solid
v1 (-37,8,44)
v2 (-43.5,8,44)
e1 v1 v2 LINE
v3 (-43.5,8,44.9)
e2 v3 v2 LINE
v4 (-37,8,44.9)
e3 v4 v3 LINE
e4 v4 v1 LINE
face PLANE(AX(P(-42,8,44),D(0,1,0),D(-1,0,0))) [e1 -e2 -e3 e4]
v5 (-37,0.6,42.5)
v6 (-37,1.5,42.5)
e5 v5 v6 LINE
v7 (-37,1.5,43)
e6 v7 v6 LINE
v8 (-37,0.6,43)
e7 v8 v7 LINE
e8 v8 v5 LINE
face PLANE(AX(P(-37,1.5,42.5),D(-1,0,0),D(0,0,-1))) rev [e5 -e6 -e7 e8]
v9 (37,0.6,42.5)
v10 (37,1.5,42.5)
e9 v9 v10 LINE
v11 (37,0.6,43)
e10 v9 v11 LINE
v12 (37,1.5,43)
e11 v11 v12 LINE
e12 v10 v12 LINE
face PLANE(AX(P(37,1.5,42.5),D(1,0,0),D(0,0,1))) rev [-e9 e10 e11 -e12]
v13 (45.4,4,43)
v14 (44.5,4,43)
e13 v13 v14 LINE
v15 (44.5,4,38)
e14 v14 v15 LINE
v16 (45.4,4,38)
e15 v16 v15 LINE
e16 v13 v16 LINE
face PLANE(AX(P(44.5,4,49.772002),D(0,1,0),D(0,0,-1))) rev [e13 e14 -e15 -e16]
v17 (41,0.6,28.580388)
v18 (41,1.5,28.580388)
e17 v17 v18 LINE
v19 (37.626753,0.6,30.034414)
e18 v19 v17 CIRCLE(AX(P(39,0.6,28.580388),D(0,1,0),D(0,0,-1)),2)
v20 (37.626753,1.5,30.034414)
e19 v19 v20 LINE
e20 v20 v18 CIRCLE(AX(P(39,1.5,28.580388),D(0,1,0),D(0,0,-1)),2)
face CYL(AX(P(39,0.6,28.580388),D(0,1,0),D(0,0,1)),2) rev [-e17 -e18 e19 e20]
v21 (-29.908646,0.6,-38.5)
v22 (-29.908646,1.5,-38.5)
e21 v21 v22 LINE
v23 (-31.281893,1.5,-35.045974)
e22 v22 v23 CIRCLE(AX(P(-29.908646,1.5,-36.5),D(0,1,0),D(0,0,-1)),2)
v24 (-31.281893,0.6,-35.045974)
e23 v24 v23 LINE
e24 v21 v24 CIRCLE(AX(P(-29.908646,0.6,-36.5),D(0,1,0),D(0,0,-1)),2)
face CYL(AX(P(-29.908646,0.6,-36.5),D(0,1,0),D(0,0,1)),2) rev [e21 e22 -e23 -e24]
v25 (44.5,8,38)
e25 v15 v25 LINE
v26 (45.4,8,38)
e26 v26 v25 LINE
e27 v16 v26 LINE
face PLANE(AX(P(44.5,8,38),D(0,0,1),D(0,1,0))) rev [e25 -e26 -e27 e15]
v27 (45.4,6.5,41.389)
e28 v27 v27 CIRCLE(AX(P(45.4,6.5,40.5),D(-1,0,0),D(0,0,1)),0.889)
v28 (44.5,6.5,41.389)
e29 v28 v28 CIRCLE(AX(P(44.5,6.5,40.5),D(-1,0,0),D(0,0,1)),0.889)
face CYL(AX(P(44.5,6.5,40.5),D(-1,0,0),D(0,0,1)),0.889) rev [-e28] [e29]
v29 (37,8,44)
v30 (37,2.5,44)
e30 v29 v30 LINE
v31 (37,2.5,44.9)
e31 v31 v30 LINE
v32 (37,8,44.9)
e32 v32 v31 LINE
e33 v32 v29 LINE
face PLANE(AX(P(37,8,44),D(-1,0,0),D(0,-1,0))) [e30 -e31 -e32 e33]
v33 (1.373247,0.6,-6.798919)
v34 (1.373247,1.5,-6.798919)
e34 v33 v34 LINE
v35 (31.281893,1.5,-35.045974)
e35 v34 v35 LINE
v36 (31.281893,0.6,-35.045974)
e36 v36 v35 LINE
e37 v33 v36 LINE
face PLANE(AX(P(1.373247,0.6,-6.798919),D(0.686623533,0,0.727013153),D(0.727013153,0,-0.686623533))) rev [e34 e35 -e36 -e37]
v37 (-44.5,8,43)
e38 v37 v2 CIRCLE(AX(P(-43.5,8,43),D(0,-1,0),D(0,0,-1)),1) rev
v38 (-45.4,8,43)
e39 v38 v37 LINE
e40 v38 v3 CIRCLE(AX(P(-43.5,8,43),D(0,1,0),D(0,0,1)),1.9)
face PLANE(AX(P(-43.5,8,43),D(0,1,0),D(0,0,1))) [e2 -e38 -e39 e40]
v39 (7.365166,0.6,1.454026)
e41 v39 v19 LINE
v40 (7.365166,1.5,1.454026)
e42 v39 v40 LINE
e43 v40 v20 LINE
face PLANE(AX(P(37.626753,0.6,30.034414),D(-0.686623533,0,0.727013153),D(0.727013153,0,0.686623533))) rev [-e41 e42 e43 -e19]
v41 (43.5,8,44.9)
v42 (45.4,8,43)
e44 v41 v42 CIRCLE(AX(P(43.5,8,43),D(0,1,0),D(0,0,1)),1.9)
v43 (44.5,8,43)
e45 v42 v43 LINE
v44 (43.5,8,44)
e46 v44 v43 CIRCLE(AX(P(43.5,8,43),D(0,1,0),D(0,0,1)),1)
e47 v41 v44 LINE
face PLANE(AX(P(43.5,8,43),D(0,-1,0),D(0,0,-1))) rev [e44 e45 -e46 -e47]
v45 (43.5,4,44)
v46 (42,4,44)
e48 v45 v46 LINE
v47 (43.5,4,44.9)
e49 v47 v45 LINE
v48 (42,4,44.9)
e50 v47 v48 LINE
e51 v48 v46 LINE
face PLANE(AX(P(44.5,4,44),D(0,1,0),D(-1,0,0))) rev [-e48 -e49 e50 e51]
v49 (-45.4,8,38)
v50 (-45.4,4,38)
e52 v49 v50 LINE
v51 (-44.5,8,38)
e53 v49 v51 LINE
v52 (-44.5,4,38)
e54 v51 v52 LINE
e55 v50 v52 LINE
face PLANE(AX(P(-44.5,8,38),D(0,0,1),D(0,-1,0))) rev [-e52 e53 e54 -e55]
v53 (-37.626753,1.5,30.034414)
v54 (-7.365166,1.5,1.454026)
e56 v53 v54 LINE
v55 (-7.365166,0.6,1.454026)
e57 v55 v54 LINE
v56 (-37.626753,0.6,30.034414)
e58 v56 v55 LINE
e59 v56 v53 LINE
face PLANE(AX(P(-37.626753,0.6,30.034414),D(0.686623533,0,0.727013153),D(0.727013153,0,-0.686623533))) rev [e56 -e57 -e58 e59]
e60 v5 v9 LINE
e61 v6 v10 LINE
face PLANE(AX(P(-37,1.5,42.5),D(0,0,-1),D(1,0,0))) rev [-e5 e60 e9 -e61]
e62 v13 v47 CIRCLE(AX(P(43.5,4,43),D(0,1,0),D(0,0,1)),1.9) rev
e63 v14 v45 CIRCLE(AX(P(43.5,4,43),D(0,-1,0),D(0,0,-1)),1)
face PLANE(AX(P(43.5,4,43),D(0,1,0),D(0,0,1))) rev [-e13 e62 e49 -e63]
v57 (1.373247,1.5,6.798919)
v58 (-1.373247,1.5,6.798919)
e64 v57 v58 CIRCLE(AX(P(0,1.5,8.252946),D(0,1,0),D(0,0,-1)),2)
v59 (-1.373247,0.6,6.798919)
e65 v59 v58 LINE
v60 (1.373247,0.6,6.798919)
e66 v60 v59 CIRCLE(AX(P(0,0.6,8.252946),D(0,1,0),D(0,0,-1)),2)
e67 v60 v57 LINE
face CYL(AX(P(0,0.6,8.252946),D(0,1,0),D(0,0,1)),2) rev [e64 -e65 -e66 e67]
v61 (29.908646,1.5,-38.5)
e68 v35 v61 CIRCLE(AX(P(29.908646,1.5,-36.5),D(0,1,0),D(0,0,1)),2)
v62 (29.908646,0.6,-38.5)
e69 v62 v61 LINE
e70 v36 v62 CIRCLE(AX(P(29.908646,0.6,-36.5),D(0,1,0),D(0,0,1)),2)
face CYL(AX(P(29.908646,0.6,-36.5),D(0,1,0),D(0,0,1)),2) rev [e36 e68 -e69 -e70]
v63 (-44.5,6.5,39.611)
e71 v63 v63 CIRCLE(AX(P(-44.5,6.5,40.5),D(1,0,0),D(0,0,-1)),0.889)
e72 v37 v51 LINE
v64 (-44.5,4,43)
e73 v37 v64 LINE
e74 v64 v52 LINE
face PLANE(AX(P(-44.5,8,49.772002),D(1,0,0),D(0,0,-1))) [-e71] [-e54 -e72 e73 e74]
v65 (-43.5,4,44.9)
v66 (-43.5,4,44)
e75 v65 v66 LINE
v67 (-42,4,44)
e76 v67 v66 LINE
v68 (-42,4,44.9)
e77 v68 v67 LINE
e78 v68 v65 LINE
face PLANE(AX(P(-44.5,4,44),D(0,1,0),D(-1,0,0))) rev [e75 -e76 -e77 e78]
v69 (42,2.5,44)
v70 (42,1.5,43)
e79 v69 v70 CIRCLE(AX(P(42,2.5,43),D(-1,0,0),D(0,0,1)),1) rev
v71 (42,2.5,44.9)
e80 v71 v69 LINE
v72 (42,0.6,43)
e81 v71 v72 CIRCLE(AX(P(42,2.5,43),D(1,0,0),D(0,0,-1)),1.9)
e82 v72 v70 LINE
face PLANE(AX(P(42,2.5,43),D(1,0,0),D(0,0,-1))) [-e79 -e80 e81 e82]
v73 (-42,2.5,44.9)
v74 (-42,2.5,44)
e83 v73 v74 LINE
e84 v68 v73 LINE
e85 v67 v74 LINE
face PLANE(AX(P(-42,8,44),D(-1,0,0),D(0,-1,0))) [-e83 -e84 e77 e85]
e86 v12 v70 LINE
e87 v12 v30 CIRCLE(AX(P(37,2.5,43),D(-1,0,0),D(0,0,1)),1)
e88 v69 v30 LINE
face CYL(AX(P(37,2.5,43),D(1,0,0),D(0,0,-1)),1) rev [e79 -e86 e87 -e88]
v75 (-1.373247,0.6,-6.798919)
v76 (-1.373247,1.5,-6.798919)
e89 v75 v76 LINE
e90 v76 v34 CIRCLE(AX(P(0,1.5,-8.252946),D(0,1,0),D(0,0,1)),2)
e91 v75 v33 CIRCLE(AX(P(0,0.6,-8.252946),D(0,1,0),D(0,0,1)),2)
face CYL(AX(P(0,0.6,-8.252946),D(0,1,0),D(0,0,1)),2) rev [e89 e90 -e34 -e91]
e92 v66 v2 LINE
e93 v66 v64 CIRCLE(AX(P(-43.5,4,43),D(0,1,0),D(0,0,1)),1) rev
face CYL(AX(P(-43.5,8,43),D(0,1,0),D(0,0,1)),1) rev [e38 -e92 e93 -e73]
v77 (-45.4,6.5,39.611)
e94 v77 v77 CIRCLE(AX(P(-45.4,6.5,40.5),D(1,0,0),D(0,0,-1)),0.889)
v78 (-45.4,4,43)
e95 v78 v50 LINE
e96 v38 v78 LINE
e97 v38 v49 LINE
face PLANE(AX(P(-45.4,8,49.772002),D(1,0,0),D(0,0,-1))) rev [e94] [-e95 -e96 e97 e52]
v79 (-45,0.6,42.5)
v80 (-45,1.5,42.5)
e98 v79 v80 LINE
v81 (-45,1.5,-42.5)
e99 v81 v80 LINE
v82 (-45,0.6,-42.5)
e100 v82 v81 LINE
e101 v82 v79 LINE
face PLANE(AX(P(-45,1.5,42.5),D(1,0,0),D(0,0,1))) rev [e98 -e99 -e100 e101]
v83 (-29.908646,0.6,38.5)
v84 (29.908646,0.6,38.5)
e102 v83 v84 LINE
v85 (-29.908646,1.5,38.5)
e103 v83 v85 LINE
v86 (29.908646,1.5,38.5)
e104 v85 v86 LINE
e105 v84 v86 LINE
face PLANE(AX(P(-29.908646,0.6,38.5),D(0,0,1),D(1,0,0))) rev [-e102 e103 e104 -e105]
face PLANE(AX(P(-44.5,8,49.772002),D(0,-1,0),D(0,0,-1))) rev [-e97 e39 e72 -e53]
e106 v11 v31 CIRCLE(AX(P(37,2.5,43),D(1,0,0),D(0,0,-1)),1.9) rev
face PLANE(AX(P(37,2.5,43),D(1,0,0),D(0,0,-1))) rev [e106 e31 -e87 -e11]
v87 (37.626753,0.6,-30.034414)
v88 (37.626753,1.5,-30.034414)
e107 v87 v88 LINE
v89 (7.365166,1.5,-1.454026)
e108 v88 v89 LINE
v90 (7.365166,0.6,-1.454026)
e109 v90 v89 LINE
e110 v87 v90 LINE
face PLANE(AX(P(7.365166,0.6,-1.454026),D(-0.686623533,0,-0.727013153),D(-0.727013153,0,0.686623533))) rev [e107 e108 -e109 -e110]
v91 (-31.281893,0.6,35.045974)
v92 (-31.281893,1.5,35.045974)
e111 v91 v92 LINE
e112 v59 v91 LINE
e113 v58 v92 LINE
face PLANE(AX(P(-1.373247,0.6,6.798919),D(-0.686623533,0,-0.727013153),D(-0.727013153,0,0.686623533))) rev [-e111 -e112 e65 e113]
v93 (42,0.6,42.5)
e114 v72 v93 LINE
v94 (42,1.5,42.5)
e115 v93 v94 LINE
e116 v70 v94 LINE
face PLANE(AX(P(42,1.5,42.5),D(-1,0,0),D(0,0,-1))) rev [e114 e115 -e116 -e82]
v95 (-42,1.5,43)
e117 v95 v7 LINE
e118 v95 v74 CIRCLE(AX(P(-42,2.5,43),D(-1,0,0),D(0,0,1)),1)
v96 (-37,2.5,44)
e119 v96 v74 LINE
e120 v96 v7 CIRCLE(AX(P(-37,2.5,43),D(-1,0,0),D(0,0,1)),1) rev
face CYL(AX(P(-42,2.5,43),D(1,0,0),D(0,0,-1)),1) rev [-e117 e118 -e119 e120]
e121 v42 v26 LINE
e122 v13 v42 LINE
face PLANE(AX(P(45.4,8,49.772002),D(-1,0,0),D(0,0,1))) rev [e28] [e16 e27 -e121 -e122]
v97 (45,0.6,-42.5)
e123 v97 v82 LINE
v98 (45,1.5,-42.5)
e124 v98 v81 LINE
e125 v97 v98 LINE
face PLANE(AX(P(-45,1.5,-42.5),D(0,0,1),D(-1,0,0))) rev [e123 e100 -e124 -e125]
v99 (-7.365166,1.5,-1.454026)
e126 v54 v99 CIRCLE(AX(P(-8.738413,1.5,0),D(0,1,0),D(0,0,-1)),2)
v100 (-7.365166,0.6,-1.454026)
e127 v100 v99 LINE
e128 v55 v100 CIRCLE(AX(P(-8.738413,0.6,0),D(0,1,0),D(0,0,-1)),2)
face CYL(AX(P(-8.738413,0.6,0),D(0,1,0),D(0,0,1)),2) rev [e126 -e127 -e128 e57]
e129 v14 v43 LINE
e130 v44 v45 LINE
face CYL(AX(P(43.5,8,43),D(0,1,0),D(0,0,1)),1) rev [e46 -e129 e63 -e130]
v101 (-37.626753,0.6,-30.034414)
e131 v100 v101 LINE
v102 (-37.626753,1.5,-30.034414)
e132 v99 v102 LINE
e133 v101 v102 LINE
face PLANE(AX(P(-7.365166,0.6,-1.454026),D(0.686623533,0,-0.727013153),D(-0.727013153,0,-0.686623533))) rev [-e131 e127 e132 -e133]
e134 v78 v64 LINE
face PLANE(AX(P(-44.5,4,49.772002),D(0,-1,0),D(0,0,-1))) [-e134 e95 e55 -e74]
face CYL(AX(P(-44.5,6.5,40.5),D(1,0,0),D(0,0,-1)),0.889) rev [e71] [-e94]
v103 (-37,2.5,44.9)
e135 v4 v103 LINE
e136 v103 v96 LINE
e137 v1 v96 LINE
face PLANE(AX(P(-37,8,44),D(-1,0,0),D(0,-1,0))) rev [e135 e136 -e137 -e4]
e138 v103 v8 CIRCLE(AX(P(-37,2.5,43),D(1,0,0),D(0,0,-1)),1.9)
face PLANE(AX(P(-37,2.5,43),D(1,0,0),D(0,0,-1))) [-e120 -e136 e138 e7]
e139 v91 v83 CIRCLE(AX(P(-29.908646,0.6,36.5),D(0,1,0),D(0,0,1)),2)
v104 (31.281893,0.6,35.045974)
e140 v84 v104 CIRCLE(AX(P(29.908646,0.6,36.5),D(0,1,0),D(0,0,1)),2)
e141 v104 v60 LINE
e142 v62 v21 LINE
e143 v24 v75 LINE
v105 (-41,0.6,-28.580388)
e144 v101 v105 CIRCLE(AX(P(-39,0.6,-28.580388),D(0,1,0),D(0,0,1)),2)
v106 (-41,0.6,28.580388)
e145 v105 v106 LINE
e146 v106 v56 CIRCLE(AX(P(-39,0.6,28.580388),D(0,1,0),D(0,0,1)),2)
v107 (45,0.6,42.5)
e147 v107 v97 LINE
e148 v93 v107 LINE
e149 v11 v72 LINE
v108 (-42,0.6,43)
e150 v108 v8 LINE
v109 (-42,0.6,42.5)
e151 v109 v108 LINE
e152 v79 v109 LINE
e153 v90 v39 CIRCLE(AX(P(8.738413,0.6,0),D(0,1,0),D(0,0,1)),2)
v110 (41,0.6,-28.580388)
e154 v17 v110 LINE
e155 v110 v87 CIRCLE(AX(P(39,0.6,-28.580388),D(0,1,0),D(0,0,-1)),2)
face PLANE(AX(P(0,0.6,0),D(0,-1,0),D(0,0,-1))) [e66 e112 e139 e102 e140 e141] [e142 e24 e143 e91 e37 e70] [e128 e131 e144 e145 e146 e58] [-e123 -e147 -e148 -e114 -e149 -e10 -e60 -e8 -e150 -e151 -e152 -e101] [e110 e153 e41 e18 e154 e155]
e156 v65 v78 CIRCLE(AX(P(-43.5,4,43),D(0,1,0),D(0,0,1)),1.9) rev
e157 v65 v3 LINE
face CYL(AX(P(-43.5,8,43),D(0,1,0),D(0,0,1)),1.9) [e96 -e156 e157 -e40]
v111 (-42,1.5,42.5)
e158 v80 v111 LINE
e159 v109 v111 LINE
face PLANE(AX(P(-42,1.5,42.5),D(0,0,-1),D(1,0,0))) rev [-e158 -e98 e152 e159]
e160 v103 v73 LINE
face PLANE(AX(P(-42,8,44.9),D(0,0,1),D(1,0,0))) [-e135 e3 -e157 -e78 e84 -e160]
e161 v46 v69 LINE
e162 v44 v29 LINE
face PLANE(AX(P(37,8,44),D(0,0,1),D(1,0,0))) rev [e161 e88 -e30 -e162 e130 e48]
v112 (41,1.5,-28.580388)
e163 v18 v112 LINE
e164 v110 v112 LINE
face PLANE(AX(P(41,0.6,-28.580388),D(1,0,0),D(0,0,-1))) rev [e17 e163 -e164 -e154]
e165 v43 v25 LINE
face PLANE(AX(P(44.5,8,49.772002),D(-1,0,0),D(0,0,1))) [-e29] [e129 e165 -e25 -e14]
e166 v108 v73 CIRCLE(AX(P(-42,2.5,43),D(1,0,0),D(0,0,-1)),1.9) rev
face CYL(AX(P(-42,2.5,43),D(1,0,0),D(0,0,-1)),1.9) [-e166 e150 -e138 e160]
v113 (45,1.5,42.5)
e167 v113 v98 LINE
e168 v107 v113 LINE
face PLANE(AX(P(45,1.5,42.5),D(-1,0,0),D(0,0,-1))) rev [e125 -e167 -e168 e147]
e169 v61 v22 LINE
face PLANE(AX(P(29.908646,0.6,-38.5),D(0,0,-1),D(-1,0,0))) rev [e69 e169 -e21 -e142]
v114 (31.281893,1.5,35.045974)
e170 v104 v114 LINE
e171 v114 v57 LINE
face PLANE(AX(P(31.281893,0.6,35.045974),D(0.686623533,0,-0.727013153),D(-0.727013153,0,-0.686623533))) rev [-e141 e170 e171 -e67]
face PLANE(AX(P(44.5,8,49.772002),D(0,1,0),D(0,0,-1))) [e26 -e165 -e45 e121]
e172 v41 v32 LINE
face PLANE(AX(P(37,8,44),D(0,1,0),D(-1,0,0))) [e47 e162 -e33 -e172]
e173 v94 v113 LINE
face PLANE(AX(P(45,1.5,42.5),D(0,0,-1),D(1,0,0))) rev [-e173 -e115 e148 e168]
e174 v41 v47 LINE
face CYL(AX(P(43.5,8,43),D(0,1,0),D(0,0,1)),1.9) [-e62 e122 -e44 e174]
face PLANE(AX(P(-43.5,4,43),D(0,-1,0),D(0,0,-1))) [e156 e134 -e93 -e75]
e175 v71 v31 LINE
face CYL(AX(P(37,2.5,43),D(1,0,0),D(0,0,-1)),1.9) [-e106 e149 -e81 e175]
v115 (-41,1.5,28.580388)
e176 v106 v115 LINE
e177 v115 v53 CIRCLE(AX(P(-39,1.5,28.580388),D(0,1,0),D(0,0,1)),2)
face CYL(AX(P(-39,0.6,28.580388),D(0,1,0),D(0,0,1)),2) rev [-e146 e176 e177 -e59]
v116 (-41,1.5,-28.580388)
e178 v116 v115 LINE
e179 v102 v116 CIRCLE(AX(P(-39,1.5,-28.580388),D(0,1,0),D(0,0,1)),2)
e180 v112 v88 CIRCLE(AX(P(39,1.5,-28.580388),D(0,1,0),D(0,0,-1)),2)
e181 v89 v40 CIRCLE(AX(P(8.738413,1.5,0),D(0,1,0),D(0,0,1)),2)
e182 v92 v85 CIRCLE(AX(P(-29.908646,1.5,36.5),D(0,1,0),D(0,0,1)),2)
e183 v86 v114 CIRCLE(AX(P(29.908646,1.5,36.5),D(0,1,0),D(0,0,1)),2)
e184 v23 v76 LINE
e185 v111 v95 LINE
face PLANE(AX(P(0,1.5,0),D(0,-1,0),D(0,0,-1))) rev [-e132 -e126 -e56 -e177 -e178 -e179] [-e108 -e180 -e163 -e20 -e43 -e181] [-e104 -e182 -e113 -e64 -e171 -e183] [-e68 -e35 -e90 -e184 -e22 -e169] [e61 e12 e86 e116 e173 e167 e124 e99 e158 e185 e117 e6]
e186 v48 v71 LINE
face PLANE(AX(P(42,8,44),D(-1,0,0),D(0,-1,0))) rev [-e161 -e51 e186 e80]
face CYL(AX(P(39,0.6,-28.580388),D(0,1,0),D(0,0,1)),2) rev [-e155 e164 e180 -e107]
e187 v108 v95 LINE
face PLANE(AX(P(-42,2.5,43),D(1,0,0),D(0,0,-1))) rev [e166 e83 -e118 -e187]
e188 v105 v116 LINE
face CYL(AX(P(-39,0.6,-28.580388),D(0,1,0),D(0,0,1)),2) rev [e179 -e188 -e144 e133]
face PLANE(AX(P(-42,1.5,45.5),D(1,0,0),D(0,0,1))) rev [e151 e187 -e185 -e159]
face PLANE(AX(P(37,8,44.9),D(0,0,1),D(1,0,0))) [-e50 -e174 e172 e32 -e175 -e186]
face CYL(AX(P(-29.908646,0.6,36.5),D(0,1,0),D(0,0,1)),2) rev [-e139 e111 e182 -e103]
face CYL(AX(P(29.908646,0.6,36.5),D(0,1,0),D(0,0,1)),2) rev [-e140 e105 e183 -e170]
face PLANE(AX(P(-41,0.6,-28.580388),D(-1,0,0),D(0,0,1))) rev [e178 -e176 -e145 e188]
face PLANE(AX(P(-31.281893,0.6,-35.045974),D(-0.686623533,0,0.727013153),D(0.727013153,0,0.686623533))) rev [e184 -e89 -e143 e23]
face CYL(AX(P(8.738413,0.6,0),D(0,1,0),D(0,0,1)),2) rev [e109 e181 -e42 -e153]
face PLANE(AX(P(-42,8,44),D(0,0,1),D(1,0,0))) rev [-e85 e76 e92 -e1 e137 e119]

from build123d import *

# Parameters (mm, degrees)
BOSS_EXTRUDE1_DEPTH                 = 1.5
SKETCH3_W                           = 5
SKETCH3_H                           = 1.5
BOSS_EXTRUDE2_DEPTH                 = 6.5
BOSS_EXTRUDE3_DEPTH                 = 6
BOSS_EXTRUDE3_DEPTH_BACK            = 1.5
SKETCH4_W                           = 1.5
SKETCH4_H                           = 4
BOSS_EXTRUDE3_2_DEPTH               = 6
BOSS_EXTRUDE3_2_DEPTH_BACK          = 1.5
SKETCH5_W                           = 2.5
SKETCH5_H                           = 1.5
BOSS_EXTRUDE4_DEPTH                 = 4
CONVERT_SOLID2_DEPTH                = 0.6
CONVERT_SOLID2_START                = 0.6
CONVERT_SOLID2_2_DEPTH              = 7.4
CONVERT_SOLID2_3_OUTLINE_W          = 5
CONVERT_SOLID2_3_OUTLINE_H          = 0.9
CONVERT_SOLID2_3_DEPTH              = 0.15504
CONVERT_SOLID2_START_2              = 4
CONVERT_SOLID2_4_DEPTH              = 4
CONVERT_SOLID2_START_3              = -42
CONVERT_SOLID2_5_DEPTH              = 84
CONVERT_SOLID2_6_DEPTH              = 5
CONVERT_SOLID2_START_4              = 37
CONVERT_SOLID2_7_DEPTH              = 5
F_0_CLEARANCE_HOLE1_D               = 1.778
F_0_CLEARANCE_HOLE1_DEPTH           = 3.175
F_0_CLEARANCE_HOLE1_TIP             = 0.53416509
F_0_CLEARANCE_HOLE1_ON_FACE_2_D     = 1.778
F_0_CLEARANCE_HOLE1_ON_FACE_2_DEPTH = 3.175
F_0_CLEARANCE_HOLE1_ON_FACE_2_TIP   = 0.53416509
CUT_EXTRUDE1_DEPTH                  = 65.182707952


with BuildPart() as part:
    # Sketch1 → Boss-Extrude1 (new body)
    with BuildSketch(Plane(origin=(0, 0, 0), x_dir=(1, 0, 0), z_dir=(0, 1, 0))):
        Polygon((-42, -45.5), (-42, -42.5), (-45, -42.5), (-45, 42.5), (45, 42.5), (45, -42.5), (42, -42.5), (42, -45.5), (37, -45.5), (37, -42.5), (-37, -42.5), (-37, -45.5), align=None)
    extrude(amount=BOSS_EXTRUDE1_DEPTH)

    # Sketch3 → Boss-Extrude2 (add)
    with BuildSketch(Plane(origin=(0, 1.5, 0), x_dir=(1, 0, 0), z_dir=(0, 1, 0))):
        with Locations((-39.5, -44.75)):
            Rectangle(SKETCH3_W, SKETCH3_H)
        with Locations((39.5, -44.75)):
            Rectangle(SKETCH3_W, SKETCH3_H)
    extrude(amount=BOSS_EXTRUDE2_DEPTH)



with BuildPart() as body_2:
    # Sketch4 → Boss-Extrude3 (new, two sides: drawn at the far end of the back side and taken through both)
    with BuildSketch(Plane(origin=(0, 0, 44), x_dir=(-1, 0, 0), z_dir=(0, 0, -1)).offset(-BOSS_EXTRUDE3_DEPTH_BACK)):
        with Locations((45.25, 6)):
            Rectangle(SKETCH4_W, SKETCH4_H)
    extrude(amount=BOSS_EXTRUDE3_DEPTH + BOSS_EXTRUDE3_DEPTH_BACK)


with BuildPart() as body_3:
    # Sketch4 → Boss-Extrude3 2 (new, two sides: drawn at the far end of the back side and taken through both)
    with BuildSketch(Plane(origin=(0, 0, 44), x_dir=(-1, 0, 0), z_dir=(0, 0, -1)).offset(-BOSS_EXTRUDE3_2_DEPTH_BACK)):
        with Locations((-45.25, 6)):
            Rectangle(SKETCH4_W, SKETCH4_H)
    extrude(amount=BOSS_EXTRUDE3_2_DEPTH + BOSS_EXTRUDE3_2_DEPTH_BACK)


with BuildPart() as part_1:
    add(part.part)

    add(body_2.part)  # Boss-Extrude4 merges body 2

    add(body_3.part)  # Boss-Extrude4 merges body 3
    # Sketch5 → Boss-Extrude4 (add)
    with BuildSketch(Plane(origin=(0, 8, 0), x_dir=(1, 0, 0), z_dir=(0, 1, 0))):
        with Locations((-43.25, -44.75)):
            Rectangle(SKETCH5_W, SKETCH5_H)
        with Locations((43.25, -44.75)):
            Rectangle(SKETCH5_W, SKETCH5_H)
    extrude(amount=-BOSS_EXTRUDE4_DEPTH)

    # Convert-Solid2: read off the stored shape, not the designer's step
    # Convert-Solid2 outline → Convert-Solid2 (cut)
    with BuildSketch(Plane(origin=(0, 0, 0), x_dir=(1, 0, 0), z_dir=(0, 1, 0))):
        Polygon((37, -45.5), (42, -45.5), (42, -42.5), (45, -42.5), (45, 42.5), (-45, 42.5), (-45, -42.5), (-42, -42.5), (-42, -45.5), (-37, -45.5), (-37, -42.5), (37, -42.5), align=None)
    extrude(amount=CONVERT_SOLID2_DEPTH, mode=Mode.SUBTRACT)

    # Convert-Solid2 2 outline → Convert-Solid2 2 (cut)
    with BuildSketch(Plane(origin=(0, 0, 0), x_dir=(1, 0, 0), z_dir=(0, 1, 0)).offset(CONVERT_SOLID2_START)):
        with BuildLine():
            Line((37, -45.5), (46, -45.5))
            Line((46, -45.5), (46, -38))
            Line((46, -38), (45.4, -38))
            Line((45.4, -38), (45.4, -43))
            ThreePointArc((45.4, -43), (44.843502884, -44.343502884), (43.5, -44.9))
            Line((43.5, -44.9), (37, -44.9))
            Line((37, -44.9), (37, -45.5))
        make_face()
        with BuildLine():
            Line((-37, -45.5), (-37, -44.9))
            Line((-37, -44.9), (-43.5, -44.9))
            ThreePointArc((-43.5, -44.9), (-44.843502884, -44.343502884), (-45.4, -43))
            Line((-45.4, -43), (-45.4, -38))
            Line((-45.4, -38), (-46, -38))
            Line((-46, -38), (-46, -45.5))
            Line((-46, -45.5), (-37, -45.5))
        make_face()
    extrude(amount=CONVERT_SOLID2_2_DEPTH, mode=Mode.SUBTRACT)

    # Convert-Solid2 3 outline → Convert-Solid2 3 (cut)
    with BuildSketch(Plane(origin=(0, 0, 0), x_dir=(1, 0, 0), z_dir=(0, 1, 0)).offset(CONVERT_SOLID2_START)):
        with Locations((39.5, -44.45)):
            Rectangle(CONVERT_SOLID2_3_OUTLINE_W, CONVERT_SOLID2_3_OUTLINE_H)
        with Locations((-39.5, -44.45)):
            Rectangle(CONVERT_SOLID2_3_OUTLINE_W, CONVERT_SOLID2_3_OUTLINE_H)
    extrude(amount=CONVERT_SOLID2_3_DEPTH, mode=Mode.SUBTRACT)

    # Convert-Solid2 4 outline → Convert-Solid2 4 (add)
    with BuildSketch(Plane(origin=(0, 0, 0), x_dir=(1, 0, 0), z_dir=(0, 1, 0)).offset(CONVERT_SOLID2_START_2)):
        with BuildLine():
            ThreePointArc((44.5, -43), (44.207106781, -43.707106781), (43.5, -44))
            Line((43.5, -44), (44.5, -44))
            Line((44.5, -44), (44.5, -43))
        make_face()
        with BuildLine():
            Line((-44.5, -44), (-43.5, -44))
            ThreePointArc((-43.5, -44), (-44.207106781, -43.707106781), (-44.5, -43))
            Line((-44.5, -43), (-44.5, -44))
        make_face()
    extrude(amount=CONVERT_SOLID2_4_DEPTH)

    # Convert-Solid2 5 outline → Convert-Solid2 5 (cut)
    with BuildSketch(Plane.YZ.offset(CONVERT_SOLID2_START_3)):
        with BuildLine():
            ThreePointArc((0.6, 43), (1.156497116, 44.343502884), (2.5, 44.9))
            Line((2.5, 44.9), (0.75504, 44.9))
            Line((0.75504, 44.9), (0.75504, 44))
            Line((0.75504, 44), (0.6, 44))
            Line((0.6, 44), (0.6, 43))
        make_face()
    extrude(amount=CONVERT_SOLID2_5_DEPTH, mode=Mode.SUBTRACT)

    # Convert-Solid2 6 outline → Convert-Solid2 6 (add)
    with BuildSketch(Plane.YZ.offset(CONVERT_SOLID2_START_3)):
        with BuildLine():
            ThreePointArc((1.5, 43), (1.792893219, 43.707106781), (2.5, 44))
            Line((2.5, 44), (1.5, 44))
            Line((1.5, 44), (1.5, 43))
        make_face()
    extrude(amount=CONVERT_SOLID2_6_DEPTH)

    # Convert-Solid2 7 outline → Convert-Solid2 7 (add)
    with BuildSketch(Plane.YZ.offset(CONVERT_SOLID2_START_4)):
        with BuildLine():
            ThreePointArc((1.5, 43), (1.792893219, 43.707106781), (2.5, 44))
            Line((2.5, 44), (1.5, 44))
            Line((1.5, 44), (1.5, 43))
        make_face()
    extrude(amount=CONVERT_SOLID2_7_DEPTH)

    # #0 Clearance Hole1
    with Locations(Plane(origin=(-44.5, 6.5, 40.5), x_dir=(0, 0, 1), z_dir=(1, 0, 0))):
        with Locations((0, 0)):
            Hole(F_0_CLEARANCE_HOLE1_D / 2, depth=F_0_CLEARANCE_HOLE1_DEPTH)
            with Locations((0, 0, -(F_0_CLEARANCE_HOLE1_DEPTH + F_0_CLEARANCE_HOLE1_TIP / 2))):  # 118° drill point
                Cone(0, F_0_CLEARANCE_HOLE1_D / 2, F_0_CLEARANCE_HOLE1_TIP, mode=Mode.SUBTRACT)

    # #0 Clearance Hole1 on face 2
    with Locations(Plane(origin=(44.5, 6.5, 40.5), x_dir=(0, 0, -1), z_dir=(-1, 0, 0))):
        with Locations((0, 0)):
            Hole(F_0_CLEARANCE_HOLE1_ON_FACE_2_D / 2, depth=F_0_CLEARANCE_HOLE1_ON_FACE_2_DEPTH)
            with Locations((0, 0, -(F_0_CLEARANCE_HOLE1_ON_FACE_2_DEPTH + F_0_CLEARANCE_HOLE1_ON_FACE_2_TIP / 2))):  # 118° drill point
                Cone(0, F_0_CLEARANCE_HOLE1_ON_FACE_2_D / 2, F_0_CLEARANCE_HOLE1_ON_FACE_2_TIP, mode=Mode.SUBTRACT)

    # Sketch18 → Cut-Extrude1 (cut, through all)
    with BuildSketch(Plane(origin=(0, 1.5, 0), x_dir=(1, 0, 0), z_dir=(0, 1, 0))):
        with BuildLine():
            Line((-1.373247066, -6.798919297), (-31.281892899, -35.045973695))
            ThreePointArc((-31.281892899, -35.045973695), (-31.767146924, -37.238900328), (-29.908645833, -38.5))
            Line((-29.908645833, -38.5), (29.908645833, -38.5))
            ThreePointArc((29.908645833, -38.5), (31.767146924, -37.238900328), (31.281892899, -35.045973695))
            Line((31.281892899, -35.045973695), (1.373247066, -6.798919297))
            ThreePointArc((1.373247066, -6.798919297), (0, -6.252945602), (-1.373247066, -6.798919297))
        make_face()
        with BuildLine():
            Line((-7.365165925, 1.454026305), (-37.626752934, 30.034414036))
            ThreePointArc((-37.626752934, 30.034414036), (-39.791677292, 30.417027888), (-41, 28.580387731))
            Line((-41, 28.580387731), (-41, -28.580387731))
            ThreePointArc((-41, -28.580387731), (-39.791677292, -30.417027888), (-37.626752934, -30.034414036))
            Line((-37.626752934, -30.034414036), (-7.365165925, -1.454026305))
            ThreePointArc((-7.365165925, -1.454026305), (-6.73841299, 0), (-7.365165925, 1.454026305))
        make_face()
        with BuildLine():
            Line((7.365165925, 1.454026305), (37.626752934, 30.034414036))
            ThreePointArc((37.626752934, 30.034414036), (39.791677292, 30.417027888), (41, 28.580387731))
            Line((41, 28.580387731), (41, -28.580387731))
            ThreePointArc((41, -28.580387731), (39.791677292, -30.417027888), (37.626752934, -30.034414036))
            Line((37.626752934, -30.034414036), (7.365165925, -1.454026305))
            ThreePointArc((7.365165925, -1.454026305), (6.73841299, 0), (7.365165925, 1.454026305))
        make_face()
        with BuildLine():
            Line((-31.281892899, 35.045973695), (-1.373247066, 6.798919297))
            ThreePointArc((-1.373247066, 6.798919297), (0, 6.252945602), (1.373247066, 6.798919297))
            Line((1.373247066, 6.798919297), (31.281892899, 35.045973695))
            ThreePointArc((31.281892899, 35.045973695), (31.767146924, 37.238900328), (29.908645833, 38.5))
            Line((29.908645833, 38.5), (-29.908645833, 38.5))
            ThreePointArc((-29.908645833, 38.5), (-31.767146924, 37.238900328), (-31.281892899, 35.045973695))
        make_face()
    extrude(amount=-CUT_EXTRUDE1_DEPTH, mode=Mode.SUBTRACT)


solid = part_1.part
